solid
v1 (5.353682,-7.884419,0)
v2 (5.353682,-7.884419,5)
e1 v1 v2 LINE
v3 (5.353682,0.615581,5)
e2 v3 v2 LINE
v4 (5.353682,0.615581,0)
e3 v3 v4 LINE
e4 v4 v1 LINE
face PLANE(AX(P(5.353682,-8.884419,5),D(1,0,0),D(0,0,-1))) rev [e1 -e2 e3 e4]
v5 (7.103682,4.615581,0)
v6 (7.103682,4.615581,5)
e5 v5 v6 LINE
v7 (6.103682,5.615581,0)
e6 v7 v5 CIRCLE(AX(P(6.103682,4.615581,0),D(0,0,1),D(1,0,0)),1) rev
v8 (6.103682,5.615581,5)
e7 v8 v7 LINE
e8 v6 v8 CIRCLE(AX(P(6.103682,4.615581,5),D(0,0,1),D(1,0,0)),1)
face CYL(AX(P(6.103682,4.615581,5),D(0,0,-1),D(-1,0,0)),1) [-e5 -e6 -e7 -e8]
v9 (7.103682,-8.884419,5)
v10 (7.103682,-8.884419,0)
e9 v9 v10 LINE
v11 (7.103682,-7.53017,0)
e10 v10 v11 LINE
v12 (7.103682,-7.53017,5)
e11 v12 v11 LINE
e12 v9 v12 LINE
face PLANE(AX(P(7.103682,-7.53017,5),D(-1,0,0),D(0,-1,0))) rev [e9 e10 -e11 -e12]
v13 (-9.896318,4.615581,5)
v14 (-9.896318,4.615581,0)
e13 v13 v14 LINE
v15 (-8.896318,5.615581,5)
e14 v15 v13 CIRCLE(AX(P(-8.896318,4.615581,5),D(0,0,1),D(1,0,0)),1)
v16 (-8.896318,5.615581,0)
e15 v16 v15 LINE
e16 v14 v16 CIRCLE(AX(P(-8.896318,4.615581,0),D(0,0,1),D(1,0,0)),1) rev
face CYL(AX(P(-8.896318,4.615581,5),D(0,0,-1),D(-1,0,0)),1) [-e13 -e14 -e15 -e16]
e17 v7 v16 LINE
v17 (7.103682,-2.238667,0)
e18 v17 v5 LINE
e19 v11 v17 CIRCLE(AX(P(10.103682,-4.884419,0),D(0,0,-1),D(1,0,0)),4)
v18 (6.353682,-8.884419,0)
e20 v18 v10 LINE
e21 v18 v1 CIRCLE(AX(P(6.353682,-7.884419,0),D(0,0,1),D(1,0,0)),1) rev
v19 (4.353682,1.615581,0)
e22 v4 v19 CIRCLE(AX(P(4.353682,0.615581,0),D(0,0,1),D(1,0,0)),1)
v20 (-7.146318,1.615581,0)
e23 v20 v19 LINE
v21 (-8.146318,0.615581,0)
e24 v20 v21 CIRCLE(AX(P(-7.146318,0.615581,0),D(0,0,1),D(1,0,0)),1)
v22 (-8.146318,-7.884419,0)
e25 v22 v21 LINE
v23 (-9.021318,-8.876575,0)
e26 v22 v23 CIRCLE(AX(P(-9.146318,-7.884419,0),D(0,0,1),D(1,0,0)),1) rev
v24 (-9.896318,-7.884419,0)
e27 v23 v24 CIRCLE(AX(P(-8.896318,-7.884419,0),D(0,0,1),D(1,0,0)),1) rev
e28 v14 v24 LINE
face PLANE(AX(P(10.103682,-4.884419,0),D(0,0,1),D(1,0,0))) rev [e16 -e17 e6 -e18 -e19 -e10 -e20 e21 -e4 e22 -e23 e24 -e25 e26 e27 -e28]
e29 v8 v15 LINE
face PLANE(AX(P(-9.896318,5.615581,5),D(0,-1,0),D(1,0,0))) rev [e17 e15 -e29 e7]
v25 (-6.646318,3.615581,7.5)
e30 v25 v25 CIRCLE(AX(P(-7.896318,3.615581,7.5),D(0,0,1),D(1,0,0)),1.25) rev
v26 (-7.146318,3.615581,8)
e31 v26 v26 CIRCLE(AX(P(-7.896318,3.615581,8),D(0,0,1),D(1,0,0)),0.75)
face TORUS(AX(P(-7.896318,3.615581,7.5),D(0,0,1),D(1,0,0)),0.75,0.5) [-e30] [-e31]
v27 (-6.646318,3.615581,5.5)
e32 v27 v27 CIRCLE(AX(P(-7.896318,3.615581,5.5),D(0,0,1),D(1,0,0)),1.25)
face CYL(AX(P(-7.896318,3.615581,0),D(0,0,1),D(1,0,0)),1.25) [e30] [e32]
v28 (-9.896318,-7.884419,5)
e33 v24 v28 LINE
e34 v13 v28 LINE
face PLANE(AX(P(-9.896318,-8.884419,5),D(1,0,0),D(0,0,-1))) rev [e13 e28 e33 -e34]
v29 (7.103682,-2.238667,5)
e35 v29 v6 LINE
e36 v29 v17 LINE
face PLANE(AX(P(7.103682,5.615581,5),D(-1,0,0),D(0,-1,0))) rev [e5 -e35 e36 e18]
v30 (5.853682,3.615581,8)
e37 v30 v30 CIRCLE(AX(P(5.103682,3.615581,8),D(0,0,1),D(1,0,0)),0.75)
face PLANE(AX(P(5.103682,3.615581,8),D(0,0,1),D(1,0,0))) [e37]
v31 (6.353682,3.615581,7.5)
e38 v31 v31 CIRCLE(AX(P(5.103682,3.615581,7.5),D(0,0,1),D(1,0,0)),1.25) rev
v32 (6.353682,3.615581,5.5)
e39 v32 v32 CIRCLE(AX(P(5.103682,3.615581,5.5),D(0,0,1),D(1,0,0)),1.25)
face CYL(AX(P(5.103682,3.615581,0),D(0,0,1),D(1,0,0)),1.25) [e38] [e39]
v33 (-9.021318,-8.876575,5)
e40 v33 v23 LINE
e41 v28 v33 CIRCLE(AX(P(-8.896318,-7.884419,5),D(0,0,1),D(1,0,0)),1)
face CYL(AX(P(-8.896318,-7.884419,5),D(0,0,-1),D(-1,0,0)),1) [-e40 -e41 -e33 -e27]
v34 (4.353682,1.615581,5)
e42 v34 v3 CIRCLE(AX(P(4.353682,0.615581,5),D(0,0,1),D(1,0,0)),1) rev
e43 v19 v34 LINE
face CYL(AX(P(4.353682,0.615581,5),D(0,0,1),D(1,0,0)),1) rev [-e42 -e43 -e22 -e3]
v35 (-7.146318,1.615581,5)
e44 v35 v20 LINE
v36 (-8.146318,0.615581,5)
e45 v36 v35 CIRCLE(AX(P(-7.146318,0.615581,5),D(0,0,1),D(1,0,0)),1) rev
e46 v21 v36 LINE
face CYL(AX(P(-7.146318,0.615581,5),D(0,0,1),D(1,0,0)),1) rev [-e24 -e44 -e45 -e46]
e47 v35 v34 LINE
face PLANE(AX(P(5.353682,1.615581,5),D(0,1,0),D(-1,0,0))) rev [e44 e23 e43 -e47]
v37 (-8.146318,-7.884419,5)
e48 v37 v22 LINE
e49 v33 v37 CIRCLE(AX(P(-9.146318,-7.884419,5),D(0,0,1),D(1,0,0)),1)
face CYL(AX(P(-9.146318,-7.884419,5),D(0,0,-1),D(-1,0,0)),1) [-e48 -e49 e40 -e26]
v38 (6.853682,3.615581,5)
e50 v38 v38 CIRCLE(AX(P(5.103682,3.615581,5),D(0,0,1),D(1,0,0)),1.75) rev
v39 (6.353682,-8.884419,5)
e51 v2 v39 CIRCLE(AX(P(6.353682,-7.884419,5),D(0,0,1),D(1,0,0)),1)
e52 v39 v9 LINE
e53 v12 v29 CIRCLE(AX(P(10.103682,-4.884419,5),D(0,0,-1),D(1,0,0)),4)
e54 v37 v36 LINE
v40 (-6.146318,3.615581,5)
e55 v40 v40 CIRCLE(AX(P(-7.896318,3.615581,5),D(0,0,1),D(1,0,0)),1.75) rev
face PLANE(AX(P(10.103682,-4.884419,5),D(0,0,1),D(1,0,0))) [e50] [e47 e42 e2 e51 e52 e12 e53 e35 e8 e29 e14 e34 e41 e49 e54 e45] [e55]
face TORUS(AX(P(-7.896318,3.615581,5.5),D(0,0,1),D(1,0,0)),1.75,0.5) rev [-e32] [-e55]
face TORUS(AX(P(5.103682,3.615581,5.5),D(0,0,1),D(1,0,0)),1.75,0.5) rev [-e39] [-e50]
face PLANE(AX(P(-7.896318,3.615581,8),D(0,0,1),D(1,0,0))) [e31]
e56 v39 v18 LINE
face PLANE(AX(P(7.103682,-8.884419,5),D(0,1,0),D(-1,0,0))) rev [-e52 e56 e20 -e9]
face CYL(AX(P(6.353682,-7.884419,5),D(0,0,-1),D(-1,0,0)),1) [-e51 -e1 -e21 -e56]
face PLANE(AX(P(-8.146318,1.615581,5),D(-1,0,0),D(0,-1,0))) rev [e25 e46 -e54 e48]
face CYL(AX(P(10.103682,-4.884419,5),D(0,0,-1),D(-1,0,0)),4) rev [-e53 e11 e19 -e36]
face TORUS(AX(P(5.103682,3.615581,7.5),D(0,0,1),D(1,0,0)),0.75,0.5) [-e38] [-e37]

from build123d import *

# Parameters (mm, degrees)
SKETCH1_R                = 1.25
BOSS_EXTRUDE1_DEPTH      = 5
BOSS_EXTRUDE2_DEPTH      = 3
BOSS_EXTRUDE2_DEPTH_BACK = 5
SKETCH2_R                = 1.25
FILLET1_R                = 1
FILLET2_R                = 0.5


with BuildPart() as part:
    # Sketch1 → Boss-Extrude1 (new body)
    with BuildSketch(Plane.XY):
        with BuildLine():
            Line((-8.146317829, 1.615581395), (-8.146317829, -8.884418605))
            Line((-8.146317829, -8.884418605), (-9.896317829, -8.884418605))
            Line((-9.896317829, -8.884418605), (-9.896317829, 5.615581395))
            Line((-9.896317829, 5.615581395), (7.103682171, 5.615581395))
            Line((7.103682171, 5.615581395), (7.103682171, -2.238667294))
            ThreePointArc((7.103682171, -2.238667294), (6.103682171, -4.884418605), (7.103682171, -7.530169916))
            Line((7.103682171, -7.530169916), (7.103682171, -8.884418605))
            Line((7.103682171, -8.884418605), (5.353682171, -8.884418605))
            Line((5.353682171, -8.884418605), (5.353682171, 1.615581395))
            Line((5.353682171, 1.615581395), (-8.146317829, 1.615581395))
        make_face()
        with Locations((-7.896317829, 3.615581395)):
            Circle(SKETCH1_R, mode=Mode.SUBTRACT)
        with Locations((5.103682171, 3.615581395)):
            Circle(SKETCH1_R, mode=Mode.SUBTRACT)
    extrude(amount=BOSS_EXTRUDE1_DEPTH)

    # Sketch2 → Boss-Extrude2 (add, two sides: drawn at the far end of the back side and taken through both)
    with BuildSketch(Plane.XY.offset(5).offset(-BOSS_EXTRUDE2_DEPTH_BACK)):
        with Locations((-7.896317829, 3.615581395)):
            Circle(SKETCH2_R)
        with Locations((5.103682171, 3.615581395)):
            Circle(SKETCH2_R)
    extrude(amount=BOSS_EXTRUDE2_DEPTH + BOSS_EXTRUDE2_DEPTH_BACK)

    # Fillet1
    # the kernel refuses this fillet: 1 mm, written as the material it adds along each edge
    with BuildSketch(Plane(origin=(-8.146317829, 1.615581395, 0), x_dir=(1, 0, 0), z_dir=(0, 0, 1)), Plane(origin=(5.353682171, 1.615581395, 0), x_dir=(0, -1, 0), z_dir=(0, 0, 1))) as fillet1_piece_1:
        with BuildLine():
            CenterArc((FILLET1_R, -FILLET1_R), FILLET1_R, 90, 90)
            Line((0, -FILLET1_R), (0, 0))
            Line((0, 0), (FILLET1_R, 0))
        make_face()
    extrude(amount=5)
    # the kernel refuses this fillet: 1 mm, written as the material it takes off along each edge
    with BuildSketch(Plane(origin=(-8.146317829, -8.884418605, -2.5), x_dir=(0, 1, 0), z_dir=(0, 0, 1)), Plane(origin=(-9.896317829, -8.884418605, -2.5), x_dir=(1, 0, 0), z_dir=(0, 0, 1)), Plane(origin=(-9.896317829, 5.615581395, -2.5), x_dir=(0, -1, 0), z_dir=(0, 0, 1)), Plane(origin=(5.353682171, -8.884418605, -2.5), x_dir=(1, 0, 0), z_dir=(0, 0, 1))) as fillet1_2_piece_1:
        with BuildLine():
            CenterArc((FILLET1_R, FILLET1_R), FILLET1_R, 180, 90)
            Line((0, FILLET1_R), (0, 0))
            Line((0, 0), (FILLET1_R, 0))
        make_face()
    extrude(amount=10, mode=Mode.SUBTRACT)
    with BuildSketch(Plane(origin=(7.103682171, 5.615581395, -2.5), x_dir=(0, -1, 0), z_dir=(0, 0, 1))) as fillet1_2_piece_2:
        with BuildLine():
            CenterArc((FILLET1_R, -FILLET1_R), FILLET1_R, 90, 90)
            Line((0, -FILLET1_R), (0, 0))
            Line((0, 0), (FILLET1_R, 0))
        make_face()
    extrude(amount=10, mode=Mode.SUBTRACT)

    # Fillet2
    fillet2_edges = [part.edges().sort_by_distance(p)[0] for p in [
        (-9.146317829, 3.615581395, 5),
        (3.853682171, 3.615581395, 5),
        (-9.146317829, 3.615581395, 8),
        (3.853682171, 3.615581395, 8),
    ]]
    fillet(fillet2_edges, radius=FILLET2_R)


solid = part.part
